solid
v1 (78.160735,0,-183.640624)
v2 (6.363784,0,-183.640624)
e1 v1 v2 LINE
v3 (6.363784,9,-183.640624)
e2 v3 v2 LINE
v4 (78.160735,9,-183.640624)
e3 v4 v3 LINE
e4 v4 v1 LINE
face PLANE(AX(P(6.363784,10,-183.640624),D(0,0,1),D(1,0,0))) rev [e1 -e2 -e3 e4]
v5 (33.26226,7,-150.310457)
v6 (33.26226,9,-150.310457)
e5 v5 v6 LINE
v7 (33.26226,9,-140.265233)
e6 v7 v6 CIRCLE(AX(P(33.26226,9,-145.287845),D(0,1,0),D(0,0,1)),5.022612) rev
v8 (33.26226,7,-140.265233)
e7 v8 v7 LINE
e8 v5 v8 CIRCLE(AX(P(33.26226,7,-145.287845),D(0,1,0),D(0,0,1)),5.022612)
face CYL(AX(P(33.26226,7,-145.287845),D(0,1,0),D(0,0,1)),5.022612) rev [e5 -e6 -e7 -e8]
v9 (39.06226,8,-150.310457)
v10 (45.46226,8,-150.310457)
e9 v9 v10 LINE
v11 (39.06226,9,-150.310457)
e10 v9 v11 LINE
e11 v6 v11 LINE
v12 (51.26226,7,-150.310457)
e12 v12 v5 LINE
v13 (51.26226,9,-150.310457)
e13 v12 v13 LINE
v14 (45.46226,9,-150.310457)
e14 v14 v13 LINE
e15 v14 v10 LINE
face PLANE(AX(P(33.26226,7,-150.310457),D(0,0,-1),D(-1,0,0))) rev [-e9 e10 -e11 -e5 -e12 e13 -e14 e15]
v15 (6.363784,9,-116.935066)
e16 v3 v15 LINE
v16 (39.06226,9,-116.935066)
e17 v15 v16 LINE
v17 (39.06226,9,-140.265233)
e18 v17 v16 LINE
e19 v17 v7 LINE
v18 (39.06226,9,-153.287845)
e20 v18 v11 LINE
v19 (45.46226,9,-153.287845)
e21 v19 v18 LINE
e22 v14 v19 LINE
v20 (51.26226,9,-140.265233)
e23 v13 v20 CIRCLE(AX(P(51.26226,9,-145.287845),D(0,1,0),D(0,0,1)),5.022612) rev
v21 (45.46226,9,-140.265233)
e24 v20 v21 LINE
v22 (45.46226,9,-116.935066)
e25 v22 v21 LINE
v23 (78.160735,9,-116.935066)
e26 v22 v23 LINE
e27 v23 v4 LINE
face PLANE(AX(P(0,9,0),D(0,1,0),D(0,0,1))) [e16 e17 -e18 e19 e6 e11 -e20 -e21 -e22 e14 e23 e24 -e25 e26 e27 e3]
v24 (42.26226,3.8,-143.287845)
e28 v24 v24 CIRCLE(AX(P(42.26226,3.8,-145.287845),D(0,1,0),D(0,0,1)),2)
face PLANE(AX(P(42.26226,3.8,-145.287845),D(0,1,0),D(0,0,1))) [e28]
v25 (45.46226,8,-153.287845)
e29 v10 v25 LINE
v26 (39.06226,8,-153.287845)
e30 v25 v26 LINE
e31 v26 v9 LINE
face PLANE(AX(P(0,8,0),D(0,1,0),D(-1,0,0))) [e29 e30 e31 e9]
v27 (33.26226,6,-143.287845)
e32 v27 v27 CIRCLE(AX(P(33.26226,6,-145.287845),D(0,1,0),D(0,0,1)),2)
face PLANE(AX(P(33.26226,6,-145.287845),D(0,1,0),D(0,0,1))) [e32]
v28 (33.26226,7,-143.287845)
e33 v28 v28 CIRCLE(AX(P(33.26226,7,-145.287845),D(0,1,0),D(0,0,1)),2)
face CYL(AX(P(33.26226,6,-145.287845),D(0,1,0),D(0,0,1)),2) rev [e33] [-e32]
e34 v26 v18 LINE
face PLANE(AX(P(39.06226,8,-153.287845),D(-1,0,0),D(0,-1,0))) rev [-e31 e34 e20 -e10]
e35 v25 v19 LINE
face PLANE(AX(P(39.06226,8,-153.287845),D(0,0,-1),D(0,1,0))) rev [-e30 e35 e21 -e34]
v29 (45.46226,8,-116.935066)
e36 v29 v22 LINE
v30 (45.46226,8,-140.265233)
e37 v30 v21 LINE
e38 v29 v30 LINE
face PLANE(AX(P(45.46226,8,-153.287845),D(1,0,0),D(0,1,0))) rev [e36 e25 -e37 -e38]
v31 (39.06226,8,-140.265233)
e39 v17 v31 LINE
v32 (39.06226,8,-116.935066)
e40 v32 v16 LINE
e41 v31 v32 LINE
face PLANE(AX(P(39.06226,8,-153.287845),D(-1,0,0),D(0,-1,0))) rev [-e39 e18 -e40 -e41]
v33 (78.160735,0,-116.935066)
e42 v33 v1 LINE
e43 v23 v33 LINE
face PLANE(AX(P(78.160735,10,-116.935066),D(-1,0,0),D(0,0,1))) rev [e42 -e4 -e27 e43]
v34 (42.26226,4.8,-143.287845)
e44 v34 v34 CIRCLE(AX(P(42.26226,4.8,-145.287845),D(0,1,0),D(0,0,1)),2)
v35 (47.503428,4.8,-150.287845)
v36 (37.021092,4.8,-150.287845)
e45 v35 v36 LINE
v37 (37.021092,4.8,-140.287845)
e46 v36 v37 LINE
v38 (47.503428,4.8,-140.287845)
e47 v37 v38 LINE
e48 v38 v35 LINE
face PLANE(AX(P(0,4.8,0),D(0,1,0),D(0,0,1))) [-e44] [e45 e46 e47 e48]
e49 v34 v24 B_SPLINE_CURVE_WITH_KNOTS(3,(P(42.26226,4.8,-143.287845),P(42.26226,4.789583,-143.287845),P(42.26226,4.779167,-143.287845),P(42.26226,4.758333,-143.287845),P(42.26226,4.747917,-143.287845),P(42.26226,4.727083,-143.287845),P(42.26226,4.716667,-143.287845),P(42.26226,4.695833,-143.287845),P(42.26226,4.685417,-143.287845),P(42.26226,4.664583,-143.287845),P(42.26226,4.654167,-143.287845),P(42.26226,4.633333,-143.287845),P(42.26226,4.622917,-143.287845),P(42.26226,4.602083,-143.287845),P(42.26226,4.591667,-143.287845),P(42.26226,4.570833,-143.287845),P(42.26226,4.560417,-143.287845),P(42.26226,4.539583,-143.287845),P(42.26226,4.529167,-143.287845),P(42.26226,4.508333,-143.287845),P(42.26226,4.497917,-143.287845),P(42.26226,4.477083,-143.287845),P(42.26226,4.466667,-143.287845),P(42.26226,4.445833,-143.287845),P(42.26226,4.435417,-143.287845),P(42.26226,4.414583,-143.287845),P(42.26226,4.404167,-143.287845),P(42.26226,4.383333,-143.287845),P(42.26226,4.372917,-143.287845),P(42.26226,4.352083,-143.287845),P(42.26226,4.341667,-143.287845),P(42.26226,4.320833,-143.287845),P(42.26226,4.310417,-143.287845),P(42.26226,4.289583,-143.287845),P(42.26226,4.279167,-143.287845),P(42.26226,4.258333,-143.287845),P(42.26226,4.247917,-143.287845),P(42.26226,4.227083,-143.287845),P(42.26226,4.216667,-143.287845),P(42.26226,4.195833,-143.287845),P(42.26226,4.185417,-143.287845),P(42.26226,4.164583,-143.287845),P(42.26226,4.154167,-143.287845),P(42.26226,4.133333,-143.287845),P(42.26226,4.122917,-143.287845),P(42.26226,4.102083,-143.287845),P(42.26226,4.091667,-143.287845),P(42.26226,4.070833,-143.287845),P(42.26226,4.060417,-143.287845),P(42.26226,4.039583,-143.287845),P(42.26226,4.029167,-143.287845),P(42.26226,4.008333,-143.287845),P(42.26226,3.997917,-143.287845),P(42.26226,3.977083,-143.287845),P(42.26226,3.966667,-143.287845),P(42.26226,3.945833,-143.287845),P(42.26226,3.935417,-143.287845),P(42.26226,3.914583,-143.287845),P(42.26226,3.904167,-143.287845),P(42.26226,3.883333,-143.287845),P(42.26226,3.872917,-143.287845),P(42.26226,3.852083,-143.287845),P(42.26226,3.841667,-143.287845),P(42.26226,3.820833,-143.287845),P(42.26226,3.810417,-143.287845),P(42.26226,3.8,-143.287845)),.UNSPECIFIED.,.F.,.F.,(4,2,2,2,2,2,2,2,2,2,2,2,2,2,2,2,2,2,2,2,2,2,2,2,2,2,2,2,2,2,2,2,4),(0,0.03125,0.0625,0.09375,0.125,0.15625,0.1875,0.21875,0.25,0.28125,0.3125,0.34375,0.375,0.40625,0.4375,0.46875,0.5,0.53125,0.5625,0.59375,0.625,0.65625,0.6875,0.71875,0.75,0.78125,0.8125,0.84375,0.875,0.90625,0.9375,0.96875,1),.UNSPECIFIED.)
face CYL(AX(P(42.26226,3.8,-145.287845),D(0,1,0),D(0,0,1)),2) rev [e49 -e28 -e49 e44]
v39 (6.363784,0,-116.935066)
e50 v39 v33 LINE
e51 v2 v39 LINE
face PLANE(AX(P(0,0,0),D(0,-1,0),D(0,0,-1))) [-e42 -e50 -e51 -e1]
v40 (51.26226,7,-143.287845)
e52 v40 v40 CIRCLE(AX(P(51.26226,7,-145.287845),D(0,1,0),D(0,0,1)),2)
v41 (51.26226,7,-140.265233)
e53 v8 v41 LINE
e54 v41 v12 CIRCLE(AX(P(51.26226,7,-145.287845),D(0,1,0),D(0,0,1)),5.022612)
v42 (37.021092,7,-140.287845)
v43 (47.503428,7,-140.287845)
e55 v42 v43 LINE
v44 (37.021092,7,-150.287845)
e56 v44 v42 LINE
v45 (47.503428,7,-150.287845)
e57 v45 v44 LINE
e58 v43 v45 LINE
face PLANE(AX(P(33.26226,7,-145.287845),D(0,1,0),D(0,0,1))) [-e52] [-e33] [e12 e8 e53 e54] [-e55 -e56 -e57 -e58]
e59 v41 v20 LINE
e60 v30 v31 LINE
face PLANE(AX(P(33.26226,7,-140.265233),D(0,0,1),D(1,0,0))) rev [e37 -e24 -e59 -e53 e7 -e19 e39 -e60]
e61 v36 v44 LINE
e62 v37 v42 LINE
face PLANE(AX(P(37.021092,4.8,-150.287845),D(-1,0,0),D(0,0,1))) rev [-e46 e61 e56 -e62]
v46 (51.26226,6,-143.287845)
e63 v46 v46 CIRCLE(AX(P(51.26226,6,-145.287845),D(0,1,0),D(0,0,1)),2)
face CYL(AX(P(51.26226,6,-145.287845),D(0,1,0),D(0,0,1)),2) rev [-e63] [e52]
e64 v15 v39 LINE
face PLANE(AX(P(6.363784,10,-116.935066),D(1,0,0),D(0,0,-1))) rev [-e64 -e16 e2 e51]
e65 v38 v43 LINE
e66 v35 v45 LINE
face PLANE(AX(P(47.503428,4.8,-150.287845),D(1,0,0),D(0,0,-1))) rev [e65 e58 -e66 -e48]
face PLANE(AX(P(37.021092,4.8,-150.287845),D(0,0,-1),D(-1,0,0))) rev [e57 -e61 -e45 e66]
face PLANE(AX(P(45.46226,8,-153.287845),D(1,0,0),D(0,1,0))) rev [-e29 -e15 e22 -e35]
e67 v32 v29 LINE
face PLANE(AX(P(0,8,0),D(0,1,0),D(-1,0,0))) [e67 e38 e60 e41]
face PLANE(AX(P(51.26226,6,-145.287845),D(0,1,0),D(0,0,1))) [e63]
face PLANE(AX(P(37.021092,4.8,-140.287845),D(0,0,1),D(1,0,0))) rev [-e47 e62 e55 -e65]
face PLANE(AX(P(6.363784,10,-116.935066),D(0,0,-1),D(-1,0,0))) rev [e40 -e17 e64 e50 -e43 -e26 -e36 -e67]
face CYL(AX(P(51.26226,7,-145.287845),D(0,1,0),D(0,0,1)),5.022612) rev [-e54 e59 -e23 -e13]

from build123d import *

# Parameters (mm, degrees)
CROQUIS1_W                = 71.796950719
CROQUIS1_H                = 66.705557785
SALIENTE_EXTRUIR1_DEPTH   = 10
CORTAR_EXTRUIR1_DEPTH     = 3
CROQUIS4_R                = 2
CORTAR_EXTRUIR3_DEPTH     = 4
CORTAR_EXTRUIR4_START     = -1
CORTAR_EXTRUIR4_OUTLINE_W = 71.796950719
CORTAR_EXTRUIR4_OUTLINE_H = 66.705557785
CORTAR_EXTRUIR4_DEPTH     = 1
CROQUIS6_W                = 10.482335709
CROQUIS6_H                = 10
CORTAR_EXTRUIR5_DEPTH     = 5.2
CROQUIS7_R                = 2
CORTAR_EXTRUIR6_DEPTH     = 6.2
CROQUIS8_W                = 6.4
CROQUIS8_H                = 36.352778893
CORTAR_EXTRUIR7_DEPTH     = 1


# Read off the part's stored shape, not the designer's step: Cortar-Extruir4
with BuildPart() as part:
    # Croquis1 → Saliente-Extruir1 (new body)
    with BuildSketch(Plane(origin=(0, 0, 0), x_dir=(1, 0, 0), z_dir=(0, 1, 0))):
        with Locations((42.262259736, 150.287845226)):
            Rectangle(CROQUIS1_W, CROQUIS1_H)
    extrude(amount=SALIENTE_EXTRUIR1_DEPTH)

    # Croquis3 → Cortar-Extruir1 (cut)
    with BuildSketch(Plane(origin=(0, 10, 0), x_dir=(1, 0, 0), z_dir=(0, 1, 0))):
        with BuildLine():
            Line((33.262259735, 150.310457053), (51.262259735, 150.310457053))
            ThreePointArc((51.262259735, 150.310457053), (56.284871563, 145.287845226), (51.262259735, 140.265233398))
            Line((51.262259735, 140.265233398), (33.262259735, 140.265233398))
            ThreePointArc((33.262259735, 140.265233398), (28.239647907, 145.287845226), (33.262259735, 150.310457053))
        make_face()
    extrude(amount=-CORTAR_EXTRUIR1_DEPTH, mode=Mode.SUBTRACT)

    # Croquis4 → Cortar-Extruir3 (cut)
    with BuildSketch(Plane(origin=(0, 10, 0), x_dir=(1, 0, 0), z_dir=(0, 1, 0))):
        with Locations(Location((51.262259735, 145.287845226, 0), (0, 0, 270))):
            Circle(CROQUIS4_R)
        with Locations(Location((33.262259735, 145.287845226, 0), (0, 0, 270))):
            Circle(CROQUIS4_R)
    extrude(amount=-CORTAR_EXTRUIR3_DEPTH, mode=Mode.SUBTRACT)

    # Cortar-Extruir4 outline → Cortar-Extruir4 (cut)
    with BuildSketch(Plane(origin=(0, 10, 0), x_dir=(1, 0, 0), z_dir=(0, 1, 0)).offset(CORTAR_EXTRUIR4_START)):
        with Locations((42.262259736, 150.287845226)):
            Rectangle(CORTAR_EXTRUIR4_OUTLINE_W, CORTAR_EXTRUIR4_OUTLINE_H)
        with BuildLine():
            ThreePointArc((33.262259735, 140.265233398), (28.239647907, 145.287845226), (33.262259735, 150.310457053))
            Line((33.262259735, 150.310457053), (51.262259735, 150.310457053))
            ThreePointArc((51.262259735, 150.310457053), (56.284871563, 145.287845226), (51.262259735, 140.265233398))
            Line((51.262259735, 140.265233398), (33.262259735, 140.265233398))
        make_face(mode=Mode.SUBTRACT)
    extrude(amount=CORTAR_EXTRUIR4_DEPTH, mode=Mode.SUBTRACT)

    # Croquis6 → Cortar-Extruir5 (cut)
    with BuildSketch(Plane(origin=(0, 10, 0), x_dir=(1, 0, 0), z_dir=(0, 1, 0))):
        with Locations((42.262259736, 145.287845226)):
            Rectangle(CROQUIS6_W, CROQUIS6_H)
    extrude(amount=-CORTAR_EXTRUIR5_DEPTH, mode=Mode.SUBTRACT)

    # Croquis7 → Cortar-Extruir6 (cut)
    with BuildSketch(Plane(origin=(0, 10, 0), x_dir=(1, 0, 0), z_dir=(0, 1, 0))):
        with Locations(Location((42.262259735, 145.287845226, 0), (0, 0, 270))):
            Circle(CROQUIS7_R)
    extrude(amount=-CORTAR_EXTRUIR6_DEPTH, mode=Mode.SUBTRACT)

    # Croquis8 → Cortar-Extruir7 (cut)
    with BuildSketch(Plane(origin=(0, 9, 0), x_dir=(1, 0, 0), z_dir=(0, 1, 0))):
        with Locations((42.262259735, 135.11145578)):
            Rectangle(CROQUIS8_W, CROQUIS8_H)
    extrude(amount=-CORTAR_EXTRUIR7_DEPTH, mode=Mode.SUBTRACT)


solid = part.part
